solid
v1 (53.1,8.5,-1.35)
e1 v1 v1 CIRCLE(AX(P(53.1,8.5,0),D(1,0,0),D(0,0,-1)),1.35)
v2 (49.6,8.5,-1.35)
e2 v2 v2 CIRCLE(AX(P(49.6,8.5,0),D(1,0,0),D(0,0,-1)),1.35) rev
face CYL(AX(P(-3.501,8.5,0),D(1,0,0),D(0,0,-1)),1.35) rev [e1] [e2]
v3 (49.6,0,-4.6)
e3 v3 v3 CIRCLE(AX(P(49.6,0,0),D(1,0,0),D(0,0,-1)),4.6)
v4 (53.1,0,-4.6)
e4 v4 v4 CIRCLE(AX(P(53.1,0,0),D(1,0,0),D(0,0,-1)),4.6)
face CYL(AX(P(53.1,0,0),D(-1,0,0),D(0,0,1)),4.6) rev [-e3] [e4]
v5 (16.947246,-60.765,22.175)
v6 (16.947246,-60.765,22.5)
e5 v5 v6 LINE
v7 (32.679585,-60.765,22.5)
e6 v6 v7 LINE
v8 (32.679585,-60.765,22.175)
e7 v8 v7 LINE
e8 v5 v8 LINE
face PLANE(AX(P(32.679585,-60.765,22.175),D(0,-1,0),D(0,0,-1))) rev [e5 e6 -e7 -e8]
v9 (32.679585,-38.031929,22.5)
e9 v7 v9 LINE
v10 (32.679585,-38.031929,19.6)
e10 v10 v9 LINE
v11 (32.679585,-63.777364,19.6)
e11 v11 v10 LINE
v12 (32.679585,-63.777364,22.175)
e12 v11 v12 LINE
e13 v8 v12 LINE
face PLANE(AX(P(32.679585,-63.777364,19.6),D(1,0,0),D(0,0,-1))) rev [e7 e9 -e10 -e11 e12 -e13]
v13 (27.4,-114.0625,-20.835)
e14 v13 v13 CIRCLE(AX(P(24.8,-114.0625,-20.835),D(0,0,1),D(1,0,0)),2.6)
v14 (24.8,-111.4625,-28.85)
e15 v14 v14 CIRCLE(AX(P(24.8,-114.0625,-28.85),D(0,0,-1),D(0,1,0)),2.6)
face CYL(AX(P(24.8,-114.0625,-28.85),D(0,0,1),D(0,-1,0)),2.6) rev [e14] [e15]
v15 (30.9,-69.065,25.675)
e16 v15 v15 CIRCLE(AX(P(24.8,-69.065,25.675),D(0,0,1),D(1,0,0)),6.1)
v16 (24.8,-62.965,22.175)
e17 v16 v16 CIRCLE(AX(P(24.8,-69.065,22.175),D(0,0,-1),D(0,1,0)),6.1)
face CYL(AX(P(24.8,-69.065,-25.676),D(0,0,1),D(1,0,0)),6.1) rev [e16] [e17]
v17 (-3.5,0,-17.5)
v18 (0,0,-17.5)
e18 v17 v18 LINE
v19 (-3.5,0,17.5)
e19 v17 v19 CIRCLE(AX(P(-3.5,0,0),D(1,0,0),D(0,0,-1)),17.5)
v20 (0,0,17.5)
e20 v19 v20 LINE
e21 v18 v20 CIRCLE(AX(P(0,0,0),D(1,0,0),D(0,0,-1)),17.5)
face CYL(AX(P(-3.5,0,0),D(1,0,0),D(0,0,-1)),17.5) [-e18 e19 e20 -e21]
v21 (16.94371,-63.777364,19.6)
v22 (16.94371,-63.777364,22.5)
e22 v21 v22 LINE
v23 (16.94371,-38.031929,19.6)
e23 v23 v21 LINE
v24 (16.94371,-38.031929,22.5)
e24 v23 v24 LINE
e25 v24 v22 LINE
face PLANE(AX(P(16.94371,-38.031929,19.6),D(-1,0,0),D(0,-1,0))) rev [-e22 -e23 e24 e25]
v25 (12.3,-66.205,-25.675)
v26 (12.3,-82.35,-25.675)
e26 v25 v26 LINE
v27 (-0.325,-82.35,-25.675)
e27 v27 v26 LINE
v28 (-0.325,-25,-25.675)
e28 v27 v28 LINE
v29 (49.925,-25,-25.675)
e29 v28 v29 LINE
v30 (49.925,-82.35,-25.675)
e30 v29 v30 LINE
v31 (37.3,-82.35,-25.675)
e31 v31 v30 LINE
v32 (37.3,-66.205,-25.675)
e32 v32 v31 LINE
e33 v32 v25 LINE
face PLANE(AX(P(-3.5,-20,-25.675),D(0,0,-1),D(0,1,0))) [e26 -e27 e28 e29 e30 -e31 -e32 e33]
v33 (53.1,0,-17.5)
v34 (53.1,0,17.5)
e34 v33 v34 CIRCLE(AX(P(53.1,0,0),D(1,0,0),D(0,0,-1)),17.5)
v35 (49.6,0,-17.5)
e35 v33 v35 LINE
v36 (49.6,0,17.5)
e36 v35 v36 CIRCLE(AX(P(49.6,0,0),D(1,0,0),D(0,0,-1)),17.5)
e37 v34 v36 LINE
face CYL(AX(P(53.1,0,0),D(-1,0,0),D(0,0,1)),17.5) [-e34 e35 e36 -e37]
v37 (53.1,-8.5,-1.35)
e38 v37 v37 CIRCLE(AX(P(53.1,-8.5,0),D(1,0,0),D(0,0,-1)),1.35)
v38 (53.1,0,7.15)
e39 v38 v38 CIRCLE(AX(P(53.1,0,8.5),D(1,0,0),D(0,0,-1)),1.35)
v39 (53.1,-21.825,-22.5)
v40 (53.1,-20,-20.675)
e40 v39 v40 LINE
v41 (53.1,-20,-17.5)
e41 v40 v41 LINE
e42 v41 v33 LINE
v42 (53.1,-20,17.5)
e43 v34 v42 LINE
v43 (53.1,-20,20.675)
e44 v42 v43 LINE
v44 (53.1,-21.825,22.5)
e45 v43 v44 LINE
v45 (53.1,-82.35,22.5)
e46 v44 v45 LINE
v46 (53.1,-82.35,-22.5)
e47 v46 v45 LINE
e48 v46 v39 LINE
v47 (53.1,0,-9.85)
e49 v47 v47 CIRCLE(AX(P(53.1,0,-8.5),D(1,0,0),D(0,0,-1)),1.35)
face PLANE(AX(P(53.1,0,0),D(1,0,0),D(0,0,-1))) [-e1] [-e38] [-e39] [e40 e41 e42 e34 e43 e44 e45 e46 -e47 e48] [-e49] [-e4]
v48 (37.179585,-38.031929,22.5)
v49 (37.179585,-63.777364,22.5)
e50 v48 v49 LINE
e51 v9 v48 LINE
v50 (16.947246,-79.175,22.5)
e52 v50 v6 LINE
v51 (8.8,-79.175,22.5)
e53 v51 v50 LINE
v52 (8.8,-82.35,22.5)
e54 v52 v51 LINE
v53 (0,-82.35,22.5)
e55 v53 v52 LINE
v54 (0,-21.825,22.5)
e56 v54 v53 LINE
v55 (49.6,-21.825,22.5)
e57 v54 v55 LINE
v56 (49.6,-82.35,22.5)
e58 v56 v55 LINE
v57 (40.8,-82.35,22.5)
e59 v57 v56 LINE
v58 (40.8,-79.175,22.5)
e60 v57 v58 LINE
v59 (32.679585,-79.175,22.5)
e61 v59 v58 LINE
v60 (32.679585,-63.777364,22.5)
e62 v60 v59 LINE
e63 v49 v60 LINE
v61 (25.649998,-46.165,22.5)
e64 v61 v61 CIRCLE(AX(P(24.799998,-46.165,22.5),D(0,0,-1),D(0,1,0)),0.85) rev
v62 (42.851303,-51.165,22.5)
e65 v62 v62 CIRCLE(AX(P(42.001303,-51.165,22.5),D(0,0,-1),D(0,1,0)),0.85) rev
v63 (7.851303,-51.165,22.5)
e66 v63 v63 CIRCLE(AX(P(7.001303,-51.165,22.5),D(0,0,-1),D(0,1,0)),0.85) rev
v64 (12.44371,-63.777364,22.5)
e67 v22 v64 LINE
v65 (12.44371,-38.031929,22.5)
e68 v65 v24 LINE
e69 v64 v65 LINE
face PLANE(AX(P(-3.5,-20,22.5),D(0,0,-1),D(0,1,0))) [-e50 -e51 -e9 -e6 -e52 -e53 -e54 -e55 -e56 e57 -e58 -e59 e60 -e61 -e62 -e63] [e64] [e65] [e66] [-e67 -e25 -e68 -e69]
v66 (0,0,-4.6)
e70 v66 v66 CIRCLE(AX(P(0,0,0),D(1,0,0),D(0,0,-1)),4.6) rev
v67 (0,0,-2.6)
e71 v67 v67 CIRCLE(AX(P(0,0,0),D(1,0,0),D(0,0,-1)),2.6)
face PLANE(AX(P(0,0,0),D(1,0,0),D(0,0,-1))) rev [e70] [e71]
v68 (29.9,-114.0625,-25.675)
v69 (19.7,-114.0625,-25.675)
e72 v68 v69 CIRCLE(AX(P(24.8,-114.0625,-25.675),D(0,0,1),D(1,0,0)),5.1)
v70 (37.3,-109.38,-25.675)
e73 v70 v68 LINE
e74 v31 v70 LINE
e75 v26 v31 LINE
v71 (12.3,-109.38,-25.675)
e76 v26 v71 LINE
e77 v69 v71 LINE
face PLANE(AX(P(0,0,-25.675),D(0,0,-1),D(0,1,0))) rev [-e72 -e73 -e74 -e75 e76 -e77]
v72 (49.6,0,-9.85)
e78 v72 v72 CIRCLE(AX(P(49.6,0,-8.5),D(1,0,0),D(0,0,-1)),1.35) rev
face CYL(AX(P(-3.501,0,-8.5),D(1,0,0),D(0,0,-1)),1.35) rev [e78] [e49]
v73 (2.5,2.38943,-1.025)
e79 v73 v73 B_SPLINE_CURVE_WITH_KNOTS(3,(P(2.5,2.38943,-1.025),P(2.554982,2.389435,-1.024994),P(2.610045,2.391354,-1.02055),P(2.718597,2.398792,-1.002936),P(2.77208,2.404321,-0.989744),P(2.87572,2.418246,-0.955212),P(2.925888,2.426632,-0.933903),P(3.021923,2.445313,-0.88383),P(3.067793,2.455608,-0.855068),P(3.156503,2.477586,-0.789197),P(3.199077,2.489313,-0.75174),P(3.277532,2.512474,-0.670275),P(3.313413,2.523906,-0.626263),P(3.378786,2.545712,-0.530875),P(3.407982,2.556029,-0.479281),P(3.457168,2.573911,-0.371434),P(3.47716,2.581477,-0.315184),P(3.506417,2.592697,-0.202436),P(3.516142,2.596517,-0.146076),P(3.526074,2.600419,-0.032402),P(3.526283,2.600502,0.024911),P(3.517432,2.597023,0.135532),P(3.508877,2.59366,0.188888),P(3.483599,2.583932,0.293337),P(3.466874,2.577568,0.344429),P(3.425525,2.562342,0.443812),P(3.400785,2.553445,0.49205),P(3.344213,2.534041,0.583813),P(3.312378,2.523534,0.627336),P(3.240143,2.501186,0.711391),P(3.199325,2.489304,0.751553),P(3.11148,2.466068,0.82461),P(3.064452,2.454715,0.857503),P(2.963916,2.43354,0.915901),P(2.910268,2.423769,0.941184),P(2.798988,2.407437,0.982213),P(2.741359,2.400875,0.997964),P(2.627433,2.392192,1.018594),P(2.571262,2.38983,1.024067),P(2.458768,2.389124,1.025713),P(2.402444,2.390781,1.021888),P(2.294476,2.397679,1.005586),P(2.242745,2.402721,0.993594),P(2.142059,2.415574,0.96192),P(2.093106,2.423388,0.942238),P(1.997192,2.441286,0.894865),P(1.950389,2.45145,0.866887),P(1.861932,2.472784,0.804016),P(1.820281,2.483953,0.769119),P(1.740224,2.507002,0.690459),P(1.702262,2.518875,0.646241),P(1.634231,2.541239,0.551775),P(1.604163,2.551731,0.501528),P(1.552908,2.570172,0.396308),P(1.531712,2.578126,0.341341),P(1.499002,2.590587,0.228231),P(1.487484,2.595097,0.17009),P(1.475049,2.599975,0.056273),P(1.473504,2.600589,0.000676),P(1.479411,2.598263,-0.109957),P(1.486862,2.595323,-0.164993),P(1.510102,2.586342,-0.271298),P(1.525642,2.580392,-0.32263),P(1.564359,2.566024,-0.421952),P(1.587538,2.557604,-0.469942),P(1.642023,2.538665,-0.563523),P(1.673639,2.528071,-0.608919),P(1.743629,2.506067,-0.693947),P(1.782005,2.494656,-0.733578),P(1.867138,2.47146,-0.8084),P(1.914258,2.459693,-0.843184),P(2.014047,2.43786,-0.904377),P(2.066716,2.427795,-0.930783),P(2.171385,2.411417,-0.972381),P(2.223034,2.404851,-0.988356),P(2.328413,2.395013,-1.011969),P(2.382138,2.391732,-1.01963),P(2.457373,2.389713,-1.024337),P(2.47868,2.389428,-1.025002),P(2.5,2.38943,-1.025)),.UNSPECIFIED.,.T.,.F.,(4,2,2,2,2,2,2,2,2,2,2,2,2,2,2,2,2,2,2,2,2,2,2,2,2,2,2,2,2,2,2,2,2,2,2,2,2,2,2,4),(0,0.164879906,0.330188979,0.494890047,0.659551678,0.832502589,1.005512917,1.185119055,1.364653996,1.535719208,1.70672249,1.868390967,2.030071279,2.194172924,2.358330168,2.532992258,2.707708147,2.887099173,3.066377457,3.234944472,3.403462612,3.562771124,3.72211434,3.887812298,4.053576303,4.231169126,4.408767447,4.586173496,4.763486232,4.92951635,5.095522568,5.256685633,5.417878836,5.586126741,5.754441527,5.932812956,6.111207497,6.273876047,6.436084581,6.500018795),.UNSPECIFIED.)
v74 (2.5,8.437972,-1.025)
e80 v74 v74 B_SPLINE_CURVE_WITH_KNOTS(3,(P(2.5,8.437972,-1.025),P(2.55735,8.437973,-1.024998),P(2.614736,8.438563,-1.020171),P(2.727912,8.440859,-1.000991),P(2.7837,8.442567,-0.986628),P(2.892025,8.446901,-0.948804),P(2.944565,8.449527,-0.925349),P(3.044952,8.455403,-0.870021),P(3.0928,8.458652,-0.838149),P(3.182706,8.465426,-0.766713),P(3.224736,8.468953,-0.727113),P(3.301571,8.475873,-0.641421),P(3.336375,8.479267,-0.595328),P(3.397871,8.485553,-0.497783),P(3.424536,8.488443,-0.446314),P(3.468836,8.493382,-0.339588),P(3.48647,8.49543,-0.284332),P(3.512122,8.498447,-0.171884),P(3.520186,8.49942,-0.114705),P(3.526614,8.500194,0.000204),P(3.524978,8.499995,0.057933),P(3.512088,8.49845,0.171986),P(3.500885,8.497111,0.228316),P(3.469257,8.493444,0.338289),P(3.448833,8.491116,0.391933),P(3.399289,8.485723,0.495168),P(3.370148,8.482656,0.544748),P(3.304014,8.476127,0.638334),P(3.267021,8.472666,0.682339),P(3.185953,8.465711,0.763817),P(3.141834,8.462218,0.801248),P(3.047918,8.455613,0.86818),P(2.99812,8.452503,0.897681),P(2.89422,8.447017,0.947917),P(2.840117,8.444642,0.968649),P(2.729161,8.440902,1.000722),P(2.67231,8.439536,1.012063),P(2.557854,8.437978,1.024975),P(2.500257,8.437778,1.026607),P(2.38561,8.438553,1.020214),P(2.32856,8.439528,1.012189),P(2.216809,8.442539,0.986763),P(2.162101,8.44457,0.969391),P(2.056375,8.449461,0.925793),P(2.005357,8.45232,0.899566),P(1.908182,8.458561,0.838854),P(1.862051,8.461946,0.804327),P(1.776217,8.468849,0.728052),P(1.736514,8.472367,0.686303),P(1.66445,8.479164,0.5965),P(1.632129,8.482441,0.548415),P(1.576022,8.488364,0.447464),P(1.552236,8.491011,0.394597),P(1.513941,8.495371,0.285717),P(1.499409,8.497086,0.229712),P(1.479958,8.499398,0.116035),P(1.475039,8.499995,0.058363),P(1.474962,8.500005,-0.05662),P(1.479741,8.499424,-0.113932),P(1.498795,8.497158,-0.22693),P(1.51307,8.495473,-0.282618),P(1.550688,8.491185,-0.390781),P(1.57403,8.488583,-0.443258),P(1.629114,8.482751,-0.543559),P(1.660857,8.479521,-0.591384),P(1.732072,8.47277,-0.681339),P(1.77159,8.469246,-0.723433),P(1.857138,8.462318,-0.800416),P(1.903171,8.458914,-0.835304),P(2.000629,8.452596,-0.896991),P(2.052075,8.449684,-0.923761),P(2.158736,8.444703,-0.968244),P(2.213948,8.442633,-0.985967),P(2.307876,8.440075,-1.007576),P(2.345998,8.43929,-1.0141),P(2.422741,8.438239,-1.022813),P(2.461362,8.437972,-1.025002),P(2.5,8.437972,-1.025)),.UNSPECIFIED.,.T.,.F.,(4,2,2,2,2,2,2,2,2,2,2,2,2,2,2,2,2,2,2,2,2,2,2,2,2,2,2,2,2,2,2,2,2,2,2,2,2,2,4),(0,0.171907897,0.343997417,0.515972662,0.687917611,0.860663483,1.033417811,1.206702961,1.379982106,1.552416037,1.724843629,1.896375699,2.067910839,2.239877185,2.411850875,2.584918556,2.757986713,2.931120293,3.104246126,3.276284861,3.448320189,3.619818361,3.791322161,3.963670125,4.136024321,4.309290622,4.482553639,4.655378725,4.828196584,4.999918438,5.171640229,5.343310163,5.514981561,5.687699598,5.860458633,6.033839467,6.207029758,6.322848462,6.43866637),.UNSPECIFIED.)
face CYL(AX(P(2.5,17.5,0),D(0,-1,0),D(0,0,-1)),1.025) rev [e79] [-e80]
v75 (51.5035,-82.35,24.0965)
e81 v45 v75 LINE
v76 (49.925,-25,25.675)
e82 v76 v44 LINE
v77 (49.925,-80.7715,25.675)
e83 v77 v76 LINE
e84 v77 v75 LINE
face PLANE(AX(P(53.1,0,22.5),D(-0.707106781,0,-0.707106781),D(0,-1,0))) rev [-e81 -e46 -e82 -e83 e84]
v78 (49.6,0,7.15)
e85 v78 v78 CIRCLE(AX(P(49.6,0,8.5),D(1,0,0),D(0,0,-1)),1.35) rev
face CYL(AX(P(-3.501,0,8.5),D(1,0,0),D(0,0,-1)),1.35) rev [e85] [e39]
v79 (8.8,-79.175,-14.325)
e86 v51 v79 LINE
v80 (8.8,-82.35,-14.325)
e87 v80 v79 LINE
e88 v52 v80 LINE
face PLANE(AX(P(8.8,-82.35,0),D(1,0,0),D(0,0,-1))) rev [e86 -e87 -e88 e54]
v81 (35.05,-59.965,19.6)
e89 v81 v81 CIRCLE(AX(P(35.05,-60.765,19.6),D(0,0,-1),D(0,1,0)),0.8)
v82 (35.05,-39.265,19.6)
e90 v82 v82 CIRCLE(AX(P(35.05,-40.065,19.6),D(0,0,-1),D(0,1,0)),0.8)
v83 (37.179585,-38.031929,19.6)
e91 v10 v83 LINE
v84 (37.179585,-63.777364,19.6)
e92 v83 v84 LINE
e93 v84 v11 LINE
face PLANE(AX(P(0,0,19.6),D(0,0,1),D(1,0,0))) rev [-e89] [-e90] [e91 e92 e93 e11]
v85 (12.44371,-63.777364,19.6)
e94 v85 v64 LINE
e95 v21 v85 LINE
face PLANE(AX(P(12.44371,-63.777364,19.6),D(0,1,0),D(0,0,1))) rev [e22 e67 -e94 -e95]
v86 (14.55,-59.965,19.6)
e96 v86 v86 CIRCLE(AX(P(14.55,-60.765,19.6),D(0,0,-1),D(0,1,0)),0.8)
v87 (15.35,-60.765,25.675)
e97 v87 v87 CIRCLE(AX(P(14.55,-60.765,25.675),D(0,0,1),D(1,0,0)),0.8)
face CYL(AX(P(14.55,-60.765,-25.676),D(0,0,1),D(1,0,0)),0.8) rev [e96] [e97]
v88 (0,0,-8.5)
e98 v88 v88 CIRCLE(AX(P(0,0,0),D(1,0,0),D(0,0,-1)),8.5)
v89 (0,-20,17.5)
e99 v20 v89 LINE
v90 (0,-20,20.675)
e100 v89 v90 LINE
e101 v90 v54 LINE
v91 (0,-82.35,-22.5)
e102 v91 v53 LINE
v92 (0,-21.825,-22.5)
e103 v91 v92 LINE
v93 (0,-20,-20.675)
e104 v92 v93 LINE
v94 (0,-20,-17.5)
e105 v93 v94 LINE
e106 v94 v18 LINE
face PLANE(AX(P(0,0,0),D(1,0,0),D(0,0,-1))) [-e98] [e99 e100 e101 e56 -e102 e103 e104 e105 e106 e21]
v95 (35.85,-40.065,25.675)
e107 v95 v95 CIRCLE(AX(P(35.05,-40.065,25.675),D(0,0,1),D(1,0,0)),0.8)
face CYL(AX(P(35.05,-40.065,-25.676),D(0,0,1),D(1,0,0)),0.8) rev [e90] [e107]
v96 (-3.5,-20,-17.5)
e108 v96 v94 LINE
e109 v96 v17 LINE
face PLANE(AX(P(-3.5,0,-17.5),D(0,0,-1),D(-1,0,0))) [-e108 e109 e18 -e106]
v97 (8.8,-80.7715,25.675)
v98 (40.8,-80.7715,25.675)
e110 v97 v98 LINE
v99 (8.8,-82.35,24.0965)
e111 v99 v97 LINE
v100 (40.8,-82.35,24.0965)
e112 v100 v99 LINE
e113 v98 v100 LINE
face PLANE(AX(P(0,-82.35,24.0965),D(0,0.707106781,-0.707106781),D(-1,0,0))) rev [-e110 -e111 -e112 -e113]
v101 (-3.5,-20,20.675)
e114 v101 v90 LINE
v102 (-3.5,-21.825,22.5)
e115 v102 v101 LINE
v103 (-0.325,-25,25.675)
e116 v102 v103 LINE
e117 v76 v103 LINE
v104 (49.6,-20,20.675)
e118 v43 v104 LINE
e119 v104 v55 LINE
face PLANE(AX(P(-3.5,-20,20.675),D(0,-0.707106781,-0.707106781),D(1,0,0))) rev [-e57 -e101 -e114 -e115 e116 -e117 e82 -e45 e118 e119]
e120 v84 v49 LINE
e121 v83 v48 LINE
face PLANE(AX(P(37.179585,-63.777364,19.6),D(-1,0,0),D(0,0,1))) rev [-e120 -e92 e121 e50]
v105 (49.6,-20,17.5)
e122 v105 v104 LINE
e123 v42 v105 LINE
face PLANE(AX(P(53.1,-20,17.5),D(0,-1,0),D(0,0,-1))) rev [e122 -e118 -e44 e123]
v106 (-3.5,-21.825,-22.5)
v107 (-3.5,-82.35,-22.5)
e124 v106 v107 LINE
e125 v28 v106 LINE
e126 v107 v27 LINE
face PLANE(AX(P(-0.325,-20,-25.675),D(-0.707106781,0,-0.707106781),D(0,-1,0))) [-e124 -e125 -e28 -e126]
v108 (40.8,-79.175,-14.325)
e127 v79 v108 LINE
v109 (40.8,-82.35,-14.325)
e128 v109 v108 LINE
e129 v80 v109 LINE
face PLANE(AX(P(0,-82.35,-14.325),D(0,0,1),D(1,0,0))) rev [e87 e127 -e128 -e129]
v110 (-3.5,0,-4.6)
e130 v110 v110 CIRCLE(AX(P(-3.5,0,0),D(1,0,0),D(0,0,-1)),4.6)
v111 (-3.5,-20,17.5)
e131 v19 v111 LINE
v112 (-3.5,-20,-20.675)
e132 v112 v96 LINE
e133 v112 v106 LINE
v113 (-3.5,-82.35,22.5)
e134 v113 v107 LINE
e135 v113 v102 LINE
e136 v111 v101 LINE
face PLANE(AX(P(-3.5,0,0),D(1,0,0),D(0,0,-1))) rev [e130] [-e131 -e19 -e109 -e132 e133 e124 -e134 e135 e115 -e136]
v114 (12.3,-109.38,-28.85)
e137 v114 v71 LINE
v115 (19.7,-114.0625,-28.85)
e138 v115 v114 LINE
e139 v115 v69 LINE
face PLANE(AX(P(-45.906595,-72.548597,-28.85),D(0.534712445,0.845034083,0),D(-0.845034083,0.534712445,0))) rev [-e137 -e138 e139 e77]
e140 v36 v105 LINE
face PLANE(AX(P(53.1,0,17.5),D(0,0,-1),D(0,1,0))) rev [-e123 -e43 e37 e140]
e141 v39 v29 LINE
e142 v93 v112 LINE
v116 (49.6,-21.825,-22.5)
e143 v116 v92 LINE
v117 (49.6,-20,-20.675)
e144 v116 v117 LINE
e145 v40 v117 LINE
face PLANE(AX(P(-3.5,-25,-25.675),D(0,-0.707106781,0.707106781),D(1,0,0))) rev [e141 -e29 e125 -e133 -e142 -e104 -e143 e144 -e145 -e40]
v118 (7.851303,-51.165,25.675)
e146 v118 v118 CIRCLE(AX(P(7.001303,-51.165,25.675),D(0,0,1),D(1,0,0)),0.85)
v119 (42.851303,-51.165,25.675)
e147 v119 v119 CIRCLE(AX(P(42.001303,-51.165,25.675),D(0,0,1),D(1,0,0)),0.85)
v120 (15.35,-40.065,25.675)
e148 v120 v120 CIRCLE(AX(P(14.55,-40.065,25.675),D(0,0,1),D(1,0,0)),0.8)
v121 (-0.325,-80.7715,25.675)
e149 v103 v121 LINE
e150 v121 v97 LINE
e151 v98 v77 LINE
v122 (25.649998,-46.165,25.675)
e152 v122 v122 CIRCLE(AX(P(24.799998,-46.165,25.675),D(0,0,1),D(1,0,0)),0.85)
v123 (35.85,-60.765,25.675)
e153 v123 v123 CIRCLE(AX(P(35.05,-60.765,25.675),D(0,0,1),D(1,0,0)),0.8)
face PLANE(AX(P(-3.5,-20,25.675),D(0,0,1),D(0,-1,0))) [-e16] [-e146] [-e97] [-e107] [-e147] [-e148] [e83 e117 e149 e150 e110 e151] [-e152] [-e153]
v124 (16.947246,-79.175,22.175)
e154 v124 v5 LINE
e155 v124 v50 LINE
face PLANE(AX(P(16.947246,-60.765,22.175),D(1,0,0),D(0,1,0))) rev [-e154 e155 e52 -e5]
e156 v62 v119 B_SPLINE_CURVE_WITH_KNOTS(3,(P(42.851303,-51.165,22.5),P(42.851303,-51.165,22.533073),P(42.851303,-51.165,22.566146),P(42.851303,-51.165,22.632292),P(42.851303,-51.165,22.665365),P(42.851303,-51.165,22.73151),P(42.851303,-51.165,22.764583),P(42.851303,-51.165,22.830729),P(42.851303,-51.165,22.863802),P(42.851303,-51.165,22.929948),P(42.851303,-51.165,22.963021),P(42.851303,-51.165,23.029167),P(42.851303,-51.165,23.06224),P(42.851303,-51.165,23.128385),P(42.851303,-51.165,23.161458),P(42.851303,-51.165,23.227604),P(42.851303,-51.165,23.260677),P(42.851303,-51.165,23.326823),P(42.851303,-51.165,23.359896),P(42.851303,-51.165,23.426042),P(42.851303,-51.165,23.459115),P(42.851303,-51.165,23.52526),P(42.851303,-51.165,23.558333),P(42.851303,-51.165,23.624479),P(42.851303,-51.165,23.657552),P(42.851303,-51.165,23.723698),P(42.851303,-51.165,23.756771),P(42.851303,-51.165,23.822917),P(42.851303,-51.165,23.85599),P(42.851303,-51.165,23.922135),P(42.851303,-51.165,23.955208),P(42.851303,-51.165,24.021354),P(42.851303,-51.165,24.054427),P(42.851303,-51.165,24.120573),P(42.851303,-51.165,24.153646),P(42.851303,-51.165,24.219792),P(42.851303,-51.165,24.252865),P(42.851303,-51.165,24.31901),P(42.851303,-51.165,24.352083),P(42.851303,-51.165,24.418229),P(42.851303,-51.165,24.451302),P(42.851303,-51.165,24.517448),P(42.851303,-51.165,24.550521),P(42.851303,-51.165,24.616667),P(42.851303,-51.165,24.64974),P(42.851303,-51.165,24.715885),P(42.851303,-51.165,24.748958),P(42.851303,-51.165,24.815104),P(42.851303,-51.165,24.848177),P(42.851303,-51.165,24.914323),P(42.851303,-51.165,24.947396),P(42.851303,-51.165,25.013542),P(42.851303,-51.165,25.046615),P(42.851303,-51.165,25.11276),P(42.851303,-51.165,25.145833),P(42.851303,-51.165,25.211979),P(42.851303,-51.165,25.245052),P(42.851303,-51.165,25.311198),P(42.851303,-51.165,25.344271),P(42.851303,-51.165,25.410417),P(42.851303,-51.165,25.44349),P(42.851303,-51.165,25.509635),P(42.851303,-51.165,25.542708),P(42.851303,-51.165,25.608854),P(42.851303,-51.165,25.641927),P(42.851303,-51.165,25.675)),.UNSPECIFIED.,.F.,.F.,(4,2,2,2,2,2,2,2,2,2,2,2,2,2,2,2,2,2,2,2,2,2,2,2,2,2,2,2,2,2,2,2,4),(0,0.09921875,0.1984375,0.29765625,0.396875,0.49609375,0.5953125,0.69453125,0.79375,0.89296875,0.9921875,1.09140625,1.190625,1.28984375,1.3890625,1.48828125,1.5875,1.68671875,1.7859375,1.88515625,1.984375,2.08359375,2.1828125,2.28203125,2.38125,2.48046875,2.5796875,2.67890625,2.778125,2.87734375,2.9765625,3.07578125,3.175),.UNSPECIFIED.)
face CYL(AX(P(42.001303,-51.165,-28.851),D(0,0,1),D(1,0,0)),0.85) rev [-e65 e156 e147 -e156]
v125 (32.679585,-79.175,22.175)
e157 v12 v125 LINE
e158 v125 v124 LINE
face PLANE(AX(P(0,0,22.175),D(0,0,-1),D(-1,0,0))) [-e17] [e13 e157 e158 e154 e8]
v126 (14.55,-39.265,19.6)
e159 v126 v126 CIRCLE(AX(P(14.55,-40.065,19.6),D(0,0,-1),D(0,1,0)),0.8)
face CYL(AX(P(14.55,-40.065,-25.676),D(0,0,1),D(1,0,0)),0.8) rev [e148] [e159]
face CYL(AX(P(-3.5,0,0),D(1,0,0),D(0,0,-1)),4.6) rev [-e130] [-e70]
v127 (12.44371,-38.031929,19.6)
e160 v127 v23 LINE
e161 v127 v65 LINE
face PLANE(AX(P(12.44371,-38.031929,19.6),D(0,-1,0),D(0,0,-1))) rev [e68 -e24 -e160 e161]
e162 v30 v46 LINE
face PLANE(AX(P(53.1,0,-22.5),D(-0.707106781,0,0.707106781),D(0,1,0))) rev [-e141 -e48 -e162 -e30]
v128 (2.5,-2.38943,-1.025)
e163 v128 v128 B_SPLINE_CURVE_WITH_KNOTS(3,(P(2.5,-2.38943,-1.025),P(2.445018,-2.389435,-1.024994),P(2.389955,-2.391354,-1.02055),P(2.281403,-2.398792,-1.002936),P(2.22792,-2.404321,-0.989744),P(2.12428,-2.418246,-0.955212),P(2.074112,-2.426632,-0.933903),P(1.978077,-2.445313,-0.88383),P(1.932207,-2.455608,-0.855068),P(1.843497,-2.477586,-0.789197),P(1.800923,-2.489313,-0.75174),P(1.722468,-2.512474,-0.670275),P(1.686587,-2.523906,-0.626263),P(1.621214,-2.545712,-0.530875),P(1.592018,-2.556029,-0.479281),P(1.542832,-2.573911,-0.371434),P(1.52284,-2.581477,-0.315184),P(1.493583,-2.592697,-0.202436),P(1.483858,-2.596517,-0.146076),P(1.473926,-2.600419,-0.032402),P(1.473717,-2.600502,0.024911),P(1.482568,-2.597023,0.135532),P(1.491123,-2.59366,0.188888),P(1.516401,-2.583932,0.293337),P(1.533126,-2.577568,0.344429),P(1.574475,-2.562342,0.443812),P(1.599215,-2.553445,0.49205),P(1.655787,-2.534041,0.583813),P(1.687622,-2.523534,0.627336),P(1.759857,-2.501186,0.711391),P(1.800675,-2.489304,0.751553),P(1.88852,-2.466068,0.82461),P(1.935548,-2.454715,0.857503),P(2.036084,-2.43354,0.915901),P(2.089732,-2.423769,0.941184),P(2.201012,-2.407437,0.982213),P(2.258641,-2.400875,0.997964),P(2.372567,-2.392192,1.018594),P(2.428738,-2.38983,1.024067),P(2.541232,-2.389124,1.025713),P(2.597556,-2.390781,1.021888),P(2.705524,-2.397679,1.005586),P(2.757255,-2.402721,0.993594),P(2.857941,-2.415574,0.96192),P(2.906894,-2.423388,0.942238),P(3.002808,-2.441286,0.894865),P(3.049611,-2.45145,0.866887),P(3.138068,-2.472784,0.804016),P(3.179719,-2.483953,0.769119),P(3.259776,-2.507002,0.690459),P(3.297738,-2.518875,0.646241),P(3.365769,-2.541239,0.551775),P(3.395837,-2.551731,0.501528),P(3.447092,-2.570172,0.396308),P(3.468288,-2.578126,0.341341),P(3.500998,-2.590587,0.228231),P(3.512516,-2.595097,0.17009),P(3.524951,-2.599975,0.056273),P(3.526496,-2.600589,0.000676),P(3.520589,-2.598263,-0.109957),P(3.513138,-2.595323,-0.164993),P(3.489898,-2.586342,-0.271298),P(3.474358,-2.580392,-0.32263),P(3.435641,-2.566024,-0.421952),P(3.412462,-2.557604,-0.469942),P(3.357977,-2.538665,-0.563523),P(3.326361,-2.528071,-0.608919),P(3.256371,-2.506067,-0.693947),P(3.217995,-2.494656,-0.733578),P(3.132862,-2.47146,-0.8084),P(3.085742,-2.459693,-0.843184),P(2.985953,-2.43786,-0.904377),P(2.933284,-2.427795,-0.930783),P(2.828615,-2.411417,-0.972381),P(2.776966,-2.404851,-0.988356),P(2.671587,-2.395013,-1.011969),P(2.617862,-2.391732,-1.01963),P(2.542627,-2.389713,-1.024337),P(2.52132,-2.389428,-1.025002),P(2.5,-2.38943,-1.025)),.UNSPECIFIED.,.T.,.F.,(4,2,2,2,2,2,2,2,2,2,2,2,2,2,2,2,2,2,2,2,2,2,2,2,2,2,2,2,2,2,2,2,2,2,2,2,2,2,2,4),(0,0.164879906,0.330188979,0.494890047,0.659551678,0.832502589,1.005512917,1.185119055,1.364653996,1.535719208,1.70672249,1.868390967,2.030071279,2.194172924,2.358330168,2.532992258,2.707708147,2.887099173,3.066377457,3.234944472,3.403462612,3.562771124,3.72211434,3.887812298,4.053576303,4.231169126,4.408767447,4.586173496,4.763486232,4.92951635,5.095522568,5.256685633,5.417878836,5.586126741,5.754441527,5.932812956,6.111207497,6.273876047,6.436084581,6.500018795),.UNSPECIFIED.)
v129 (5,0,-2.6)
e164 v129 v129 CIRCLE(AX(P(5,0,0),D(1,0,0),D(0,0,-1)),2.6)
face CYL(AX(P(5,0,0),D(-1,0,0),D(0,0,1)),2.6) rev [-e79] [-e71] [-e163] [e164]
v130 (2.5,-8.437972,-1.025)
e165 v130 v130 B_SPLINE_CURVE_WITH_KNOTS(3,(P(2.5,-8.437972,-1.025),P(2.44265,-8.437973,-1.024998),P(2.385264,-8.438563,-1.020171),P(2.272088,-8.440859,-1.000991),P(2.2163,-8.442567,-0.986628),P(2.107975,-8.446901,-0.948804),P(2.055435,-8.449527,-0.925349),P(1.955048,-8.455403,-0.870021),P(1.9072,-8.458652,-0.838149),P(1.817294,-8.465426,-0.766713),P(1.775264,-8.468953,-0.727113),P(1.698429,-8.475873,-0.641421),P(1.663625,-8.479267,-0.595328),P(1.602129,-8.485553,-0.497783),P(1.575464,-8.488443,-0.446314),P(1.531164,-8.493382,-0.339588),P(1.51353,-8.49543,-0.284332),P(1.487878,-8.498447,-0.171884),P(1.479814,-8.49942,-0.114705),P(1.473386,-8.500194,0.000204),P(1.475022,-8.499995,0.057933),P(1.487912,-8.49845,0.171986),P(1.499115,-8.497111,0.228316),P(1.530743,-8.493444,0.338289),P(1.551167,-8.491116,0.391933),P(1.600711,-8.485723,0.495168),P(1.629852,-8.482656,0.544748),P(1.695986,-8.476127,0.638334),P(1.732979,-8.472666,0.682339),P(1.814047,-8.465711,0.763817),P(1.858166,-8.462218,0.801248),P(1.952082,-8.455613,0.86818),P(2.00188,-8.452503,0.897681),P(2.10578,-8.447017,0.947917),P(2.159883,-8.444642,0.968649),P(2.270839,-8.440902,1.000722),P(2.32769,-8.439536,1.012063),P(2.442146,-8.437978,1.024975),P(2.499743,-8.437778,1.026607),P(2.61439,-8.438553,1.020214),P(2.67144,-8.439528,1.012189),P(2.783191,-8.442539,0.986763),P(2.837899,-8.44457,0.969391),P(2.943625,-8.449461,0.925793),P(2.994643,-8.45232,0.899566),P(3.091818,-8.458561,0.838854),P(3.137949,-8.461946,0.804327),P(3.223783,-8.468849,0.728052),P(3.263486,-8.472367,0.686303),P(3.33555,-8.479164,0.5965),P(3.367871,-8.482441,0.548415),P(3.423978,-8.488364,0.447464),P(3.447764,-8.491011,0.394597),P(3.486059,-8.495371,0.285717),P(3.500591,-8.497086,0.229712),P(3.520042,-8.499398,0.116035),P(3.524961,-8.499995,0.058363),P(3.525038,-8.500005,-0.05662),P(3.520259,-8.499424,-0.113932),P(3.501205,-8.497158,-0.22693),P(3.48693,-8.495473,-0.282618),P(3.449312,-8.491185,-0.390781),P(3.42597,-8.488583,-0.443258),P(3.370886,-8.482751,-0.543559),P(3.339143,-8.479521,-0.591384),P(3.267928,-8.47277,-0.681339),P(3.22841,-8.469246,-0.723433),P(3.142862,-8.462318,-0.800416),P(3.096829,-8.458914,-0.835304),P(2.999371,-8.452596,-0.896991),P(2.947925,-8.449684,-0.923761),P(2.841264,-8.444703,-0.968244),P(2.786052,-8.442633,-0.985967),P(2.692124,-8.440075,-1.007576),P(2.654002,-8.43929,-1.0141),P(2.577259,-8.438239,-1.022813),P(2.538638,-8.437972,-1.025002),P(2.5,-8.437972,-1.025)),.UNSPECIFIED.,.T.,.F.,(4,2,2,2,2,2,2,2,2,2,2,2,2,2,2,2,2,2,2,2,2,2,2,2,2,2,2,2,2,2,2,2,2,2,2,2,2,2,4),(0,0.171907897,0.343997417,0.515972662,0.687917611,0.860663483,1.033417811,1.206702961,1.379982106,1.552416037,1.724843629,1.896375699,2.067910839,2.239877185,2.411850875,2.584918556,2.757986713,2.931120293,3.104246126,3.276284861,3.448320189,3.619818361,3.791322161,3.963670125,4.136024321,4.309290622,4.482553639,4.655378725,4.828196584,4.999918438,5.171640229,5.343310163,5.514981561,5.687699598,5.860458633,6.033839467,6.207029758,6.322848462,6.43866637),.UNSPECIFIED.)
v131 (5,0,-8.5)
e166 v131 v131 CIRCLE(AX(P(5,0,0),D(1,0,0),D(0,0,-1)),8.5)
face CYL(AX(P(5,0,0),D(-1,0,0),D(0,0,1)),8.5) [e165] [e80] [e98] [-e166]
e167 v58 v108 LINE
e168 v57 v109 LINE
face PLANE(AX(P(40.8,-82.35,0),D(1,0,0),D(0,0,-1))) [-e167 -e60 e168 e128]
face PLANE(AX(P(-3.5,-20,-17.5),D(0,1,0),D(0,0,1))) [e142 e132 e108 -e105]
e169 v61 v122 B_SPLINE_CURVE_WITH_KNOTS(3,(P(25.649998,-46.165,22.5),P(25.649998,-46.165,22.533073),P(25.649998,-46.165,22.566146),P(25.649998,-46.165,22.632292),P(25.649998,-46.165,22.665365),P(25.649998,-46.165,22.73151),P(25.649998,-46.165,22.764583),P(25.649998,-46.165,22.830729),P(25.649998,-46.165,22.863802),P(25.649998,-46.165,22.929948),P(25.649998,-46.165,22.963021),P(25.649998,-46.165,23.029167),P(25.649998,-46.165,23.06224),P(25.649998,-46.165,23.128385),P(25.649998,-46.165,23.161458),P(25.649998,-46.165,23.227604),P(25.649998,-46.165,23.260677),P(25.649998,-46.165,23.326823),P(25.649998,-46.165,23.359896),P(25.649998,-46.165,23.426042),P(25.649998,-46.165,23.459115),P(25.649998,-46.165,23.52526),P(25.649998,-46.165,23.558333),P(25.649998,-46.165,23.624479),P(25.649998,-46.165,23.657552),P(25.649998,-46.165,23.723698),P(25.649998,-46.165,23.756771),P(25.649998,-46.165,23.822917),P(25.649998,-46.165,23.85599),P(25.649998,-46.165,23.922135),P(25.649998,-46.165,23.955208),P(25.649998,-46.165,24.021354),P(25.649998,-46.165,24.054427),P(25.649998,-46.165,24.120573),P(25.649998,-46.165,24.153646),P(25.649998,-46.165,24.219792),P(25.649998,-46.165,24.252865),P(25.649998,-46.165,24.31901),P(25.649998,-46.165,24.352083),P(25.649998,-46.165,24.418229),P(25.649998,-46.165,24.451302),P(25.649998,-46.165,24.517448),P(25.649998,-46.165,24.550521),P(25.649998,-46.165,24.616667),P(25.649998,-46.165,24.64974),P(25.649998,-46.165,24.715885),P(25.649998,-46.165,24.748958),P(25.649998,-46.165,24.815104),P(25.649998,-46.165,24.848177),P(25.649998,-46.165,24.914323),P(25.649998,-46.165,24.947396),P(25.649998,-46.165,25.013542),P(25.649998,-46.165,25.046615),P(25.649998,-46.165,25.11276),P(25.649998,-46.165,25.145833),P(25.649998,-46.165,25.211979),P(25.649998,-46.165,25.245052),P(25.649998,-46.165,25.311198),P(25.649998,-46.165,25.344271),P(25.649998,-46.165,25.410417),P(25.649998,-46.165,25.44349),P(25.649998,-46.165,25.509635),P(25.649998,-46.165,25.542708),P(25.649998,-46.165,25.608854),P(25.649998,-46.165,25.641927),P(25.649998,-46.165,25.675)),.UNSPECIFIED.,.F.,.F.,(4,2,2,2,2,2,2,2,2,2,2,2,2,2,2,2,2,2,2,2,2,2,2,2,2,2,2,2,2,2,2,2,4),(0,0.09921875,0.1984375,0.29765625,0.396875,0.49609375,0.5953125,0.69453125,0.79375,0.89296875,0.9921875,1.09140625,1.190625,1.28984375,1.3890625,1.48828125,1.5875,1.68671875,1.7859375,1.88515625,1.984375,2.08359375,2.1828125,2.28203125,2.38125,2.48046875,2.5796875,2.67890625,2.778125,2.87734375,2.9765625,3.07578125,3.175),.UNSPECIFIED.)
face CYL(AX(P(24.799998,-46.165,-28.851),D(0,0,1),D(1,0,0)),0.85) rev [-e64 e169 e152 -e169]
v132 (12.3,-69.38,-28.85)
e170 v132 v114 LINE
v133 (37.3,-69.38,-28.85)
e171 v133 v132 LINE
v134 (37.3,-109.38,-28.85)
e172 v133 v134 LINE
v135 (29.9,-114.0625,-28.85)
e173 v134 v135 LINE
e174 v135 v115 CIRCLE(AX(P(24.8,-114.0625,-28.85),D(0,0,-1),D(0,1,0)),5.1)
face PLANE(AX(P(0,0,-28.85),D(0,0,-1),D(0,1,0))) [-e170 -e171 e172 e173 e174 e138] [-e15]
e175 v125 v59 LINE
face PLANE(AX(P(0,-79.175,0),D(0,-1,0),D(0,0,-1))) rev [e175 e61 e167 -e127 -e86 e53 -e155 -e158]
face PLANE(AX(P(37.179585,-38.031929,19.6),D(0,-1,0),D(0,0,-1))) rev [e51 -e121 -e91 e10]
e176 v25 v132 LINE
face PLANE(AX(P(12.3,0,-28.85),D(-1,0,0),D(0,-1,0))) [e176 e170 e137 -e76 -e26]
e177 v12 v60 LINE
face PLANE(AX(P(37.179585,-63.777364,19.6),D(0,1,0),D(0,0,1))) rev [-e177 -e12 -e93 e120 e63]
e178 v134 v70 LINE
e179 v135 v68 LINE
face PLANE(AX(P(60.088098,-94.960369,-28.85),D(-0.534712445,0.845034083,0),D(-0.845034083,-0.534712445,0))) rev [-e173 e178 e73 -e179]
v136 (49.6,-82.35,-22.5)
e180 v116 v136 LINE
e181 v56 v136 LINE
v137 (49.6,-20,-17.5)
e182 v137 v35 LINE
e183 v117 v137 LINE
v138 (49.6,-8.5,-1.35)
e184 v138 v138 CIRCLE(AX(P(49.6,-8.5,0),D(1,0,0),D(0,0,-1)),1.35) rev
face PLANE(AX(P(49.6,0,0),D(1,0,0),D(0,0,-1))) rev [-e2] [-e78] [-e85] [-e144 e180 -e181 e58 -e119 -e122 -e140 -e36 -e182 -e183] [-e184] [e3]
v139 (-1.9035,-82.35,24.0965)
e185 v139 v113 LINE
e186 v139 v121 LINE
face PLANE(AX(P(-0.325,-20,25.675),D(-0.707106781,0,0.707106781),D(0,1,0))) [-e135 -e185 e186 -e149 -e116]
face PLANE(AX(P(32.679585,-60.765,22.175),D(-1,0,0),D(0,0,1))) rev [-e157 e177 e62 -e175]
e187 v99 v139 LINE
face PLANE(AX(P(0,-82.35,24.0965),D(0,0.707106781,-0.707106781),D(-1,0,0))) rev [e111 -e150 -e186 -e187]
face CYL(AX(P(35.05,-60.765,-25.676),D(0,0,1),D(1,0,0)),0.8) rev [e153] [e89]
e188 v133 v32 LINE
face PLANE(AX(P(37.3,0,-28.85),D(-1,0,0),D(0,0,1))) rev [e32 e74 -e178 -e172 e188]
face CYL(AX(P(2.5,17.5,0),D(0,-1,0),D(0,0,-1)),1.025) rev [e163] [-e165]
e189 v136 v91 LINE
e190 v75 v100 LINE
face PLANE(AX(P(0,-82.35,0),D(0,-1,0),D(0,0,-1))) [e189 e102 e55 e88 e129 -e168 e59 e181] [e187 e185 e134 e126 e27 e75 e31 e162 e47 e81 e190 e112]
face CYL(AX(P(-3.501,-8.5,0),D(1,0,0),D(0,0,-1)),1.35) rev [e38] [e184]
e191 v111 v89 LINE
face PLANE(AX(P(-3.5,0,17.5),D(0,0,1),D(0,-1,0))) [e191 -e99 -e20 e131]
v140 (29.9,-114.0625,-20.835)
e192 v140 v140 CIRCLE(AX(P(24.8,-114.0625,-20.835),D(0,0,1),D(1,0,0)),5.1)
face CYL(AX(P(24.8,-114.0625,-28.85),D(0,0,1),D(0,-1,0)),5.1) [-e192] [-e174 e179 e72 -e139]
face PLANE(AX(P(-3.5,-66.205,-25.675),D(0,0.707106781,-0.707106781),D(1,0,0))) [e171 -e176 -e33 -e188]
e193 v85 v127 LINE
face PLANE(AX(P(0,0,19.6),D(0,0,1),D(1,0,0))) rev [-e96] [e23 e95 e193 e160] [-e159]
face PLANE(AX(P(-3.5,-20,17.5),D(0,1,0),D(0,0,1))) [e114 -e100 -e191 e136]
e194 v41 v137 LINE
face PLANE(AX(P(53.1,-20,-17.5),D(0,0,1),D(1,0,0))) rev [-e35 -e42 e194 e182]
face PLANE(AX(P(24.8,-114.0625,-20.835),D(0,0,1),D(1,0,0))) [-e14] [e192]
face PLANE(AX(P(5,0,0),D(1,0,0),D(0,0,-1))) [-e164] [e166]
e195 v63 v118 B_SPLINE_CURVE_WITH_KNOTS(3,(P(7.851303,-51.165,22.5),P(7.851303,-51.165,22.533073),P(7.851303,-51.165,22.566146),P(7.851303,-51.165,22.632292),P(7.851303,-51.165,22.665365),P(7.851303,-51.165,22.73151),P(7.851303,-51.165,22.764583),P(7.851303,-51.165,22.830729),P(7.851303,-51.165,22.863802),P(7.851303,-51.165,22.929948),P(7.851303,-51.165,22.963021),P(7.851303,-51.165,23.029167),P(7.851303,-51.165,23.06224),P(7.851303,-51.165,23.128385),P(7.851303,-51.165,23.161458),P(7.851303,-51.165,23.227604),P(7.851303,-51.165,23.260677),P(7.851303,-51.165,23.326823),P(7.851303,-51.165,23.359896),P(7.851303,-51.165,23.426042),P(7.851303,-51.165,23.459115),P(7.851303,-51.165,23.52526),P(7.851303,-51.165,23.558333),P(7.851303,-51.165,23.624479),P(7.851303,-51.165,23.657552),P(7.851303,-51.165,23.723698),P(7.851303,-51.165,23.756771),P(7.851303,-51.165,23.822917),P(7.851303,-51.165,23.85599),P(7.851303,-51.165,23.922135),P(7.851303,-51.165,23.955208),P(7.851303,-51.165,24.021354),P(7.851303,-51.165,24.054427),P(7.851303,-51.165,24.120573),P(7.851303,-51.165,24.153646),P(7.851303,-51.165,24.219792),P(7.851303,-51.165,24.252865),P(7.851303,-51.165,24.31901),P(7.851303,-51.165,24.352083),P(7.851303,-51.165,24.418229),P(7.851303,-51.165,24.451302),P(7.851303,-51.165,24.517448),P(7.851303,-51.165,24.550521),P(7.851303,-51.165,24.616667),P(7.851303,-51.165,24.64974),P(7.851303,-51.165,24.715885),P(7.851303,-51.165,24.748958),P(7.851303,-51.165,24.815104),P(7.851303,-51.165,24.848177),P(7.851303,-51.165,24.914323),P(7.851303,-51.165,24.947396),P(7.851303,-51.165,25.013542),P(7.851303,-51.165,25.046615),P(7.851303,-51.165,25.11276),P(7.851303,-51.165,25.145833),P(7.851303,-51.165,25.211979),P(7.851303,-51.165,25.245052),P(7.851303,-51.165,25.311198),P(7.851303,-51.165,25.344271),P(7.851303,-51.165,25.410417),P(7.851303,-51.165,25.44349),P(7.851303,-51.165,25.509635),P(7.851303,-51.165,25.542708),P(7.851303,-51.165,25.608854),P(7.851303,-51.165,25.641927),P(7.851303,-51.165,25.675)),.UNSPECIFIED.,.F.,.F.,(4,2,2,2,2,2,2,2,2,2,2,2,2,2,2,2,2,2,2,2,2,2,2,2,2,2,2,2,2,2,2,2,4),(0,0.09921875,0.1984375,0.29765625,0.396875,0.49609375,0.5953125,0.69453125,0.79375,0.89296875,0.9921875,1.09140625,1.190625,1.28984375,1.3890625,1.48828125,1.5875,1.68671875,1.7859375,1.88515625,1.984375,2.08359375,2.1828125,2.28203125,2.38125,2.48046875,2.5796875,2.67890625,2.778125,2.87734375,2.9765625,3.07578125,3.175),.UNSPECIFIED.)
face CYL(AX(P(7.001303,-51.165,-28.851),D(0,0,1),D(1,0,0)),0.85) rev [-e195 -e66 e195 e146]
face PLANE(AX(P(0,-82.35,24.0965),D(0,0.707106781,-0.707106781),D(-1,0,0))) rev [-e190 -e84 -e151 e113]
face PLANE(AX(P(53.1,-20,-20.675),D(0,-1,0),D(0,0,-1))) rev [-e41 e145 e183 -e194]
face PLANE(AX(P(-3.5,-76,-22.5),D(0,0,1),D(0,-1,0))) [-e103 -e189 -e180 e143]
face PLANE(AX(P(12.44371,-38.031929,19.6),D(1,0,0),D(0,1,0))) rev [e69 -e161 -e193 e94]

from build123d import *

# Parameters (mm, degrees)
SKETCH1_R                = 4.6
BOSS_EXTRUDE1_DEPTH      = 3.5
BOSS_EXTRUDE2_DEPTH      = 49.6
BOSS_EXTRUDE2_DEPTH_BACK = 3.5
CHAMFER2_SIZE            = 5
CUT_EXTRUDE1_REACH       = 110.911
SKETCH4_W                = 49.6
SKETCH4_H                = 45
BOSS_EXTRUDE3_START      = 3.5
SKETCH5_R                = 4.6
BOSS_EXTRUDE3_DEPTH      = 3.5
CHAMFER3_SIZE            = 3.175
SKETCH6_R                = 8.5
SKETCH6_R_2              = 2.6
BOSS_EXTRUDE4_DEPTH      = 5
SKETCH7_R                = 1.025
CUT_EXTRUDE2_DEPTH       = 114.246948082
CUT_EXTRUDE3_REACH       = 102.655
SKETCH9_R                = 1.35
SKETCH10_W               = 32
SKETCH10_H               = 36.825
SKETCH10_H_2             = 3.175
BOSS_EXTRUDE5_DEPTH      = 3.175
CHAMFER4_SIZE            = 1.5785
BOSS_EXTRUDE6_DEPTH      = 3.175
CHAMFER5_SIZE            = 1.5785
CUT_EXTRUDE4_REACH       = 112.625
SKETCH12_R               = 6.1
SKETCH12_R_2             = 0.800000003
SKETCH12_R_3             = 0.800000004
SKETCH12_R_4             = 0.8
SKETCH13_W               = 4.5
SKETCH13_H               = 25.745434895
SKETCH13_R               = 0.8
SKETCH13_R_2             = 0.800000003
SKETCH13_R_3             = 0.800000004
BOSS_EXTRUDE7_DEPTH      = 2.9
SKETCH14_W               = 15.732338892
SKETCH14_H               = 18.41
SKETCH14_R               = 6.1
BOSS_EXTRUDE8_DEPTH      = 0.325
SKETCH20_R               = 2.6
BOSS_EXTRUDE11_DEPTH     = 3.175
BOSS_EXTRUDE12_START     = 4.84
SKETCH21_R               = 5.1
SKETCH21_R_2             = 2.6
BOSS_EXTRUDE12_DEPTH     = 4.84
CHAMFER10_SIZE           = 3.175
CUT_EXTRUDE5_REACH       = 143.394
SKETCH23_R               = 0.85


with BuildPart() as part:
    # Sketch1 → Boss-Extrude1 (new body)
    with BuildSketch(Plane(origin=(0, 0, 0), x_dir=(0, 0, -1), z_dir=(1, 0, 0))):
        with BuildLine():
            Line((-17.5, 0), (-17.5, -20))
            Line((-17.5, -20), (-22.5, -20))
            Line((-22.5, -20), (-22.5, -76))
            Line((-22.5, -76), (22.5, -76))
            Line((22.5, -76), (22.5, -20))
            Line((22.5, -20), (17.5, -20))
            Line((17.5, -20), (17.5, 0))
            ThreePointArc((17.5, 0), (0, 17.5), (-17.5, 0))
        make_face()
        Circle(SKETCH1_R, mode=Mode.SUBTRACT)
    extrude(amount=-BOSS_EXTRUDE1_DEPTH)

    # Sketch2 → Boss-Extrude2 (add, two sides: drawn at the far end of the back side and taken through both)
    with BuildSketch(Plane(origin=(0, 0, 0), x_dir=(0, 0, -1), z_dir=(1, 0, 0)).offset(-BOSS_EXTRUDE2_DEPTH_BACK)):
        Polygon((-22.5, -20), (-22.5, -76), (22.5, -76), (22.5, -20), (25.675, -20), (25.675, -79.175), (-25.675, -79.175), (-25.675, -20), align=None)
    extrude(amount=BOSS_EXTRUDE2_DEPTH + BOSS_EXTRUDE2_DEPTH_BACK)

    # Chamfer2
    chamfer2_edges = [part.edges().sort_by_distance(p)[0] for p in [
        (23.05, -20, -25.675),
        (23.05, -20, 25.675),
    ]]
    chamfer(chamfer2_edges, length=CHAMFER2_SIZE)

    # Sketch4 → Cut-Extrude1 (cut, up to next)
    with BuildSketch(Plane(origin=(0, -76, 0), x_dir=(1, 0, 0), z_dir=(0, 1, 0)), mode=Mode.PRIVATE) as cut_extrude1_sk1:
        with Locations((24.8, 0)):
            Rectangle(SKETCH4_W, SKETCH4_H)
    cut_extrude1_tool1 = extrude(cut_extrude1_sk1.sketch, amount=-CUT_EXTRUDE1_REACH, mode=Mode.PRIVATE) & part.part
    add(cut_extrude1_tool1.solids().sort_by_distance((24.8, -76, 0))[0], mode=Mode.SUBTRACT)

    # Sketch5 → Boss-Extrude3 (add)
    with BuildSketch(Plane(origin=(49.6, 0, 0), x_dir=(0, 0, -1), z_dir=(1, 0, 0)).offset(BOSS_EXTRUDE3_START)):
        with BuildLine():
            Line((20.675, -20), (17.5, -20))
            Line((17.5, -20), (17.5, 0))
            ThreePointArc((17.5, 0), (0, 17.5), (-17.5, 0))
            Line((-17.5, 0), (-17.5, -20))
            Line((-17.5, -20), (-20.675, -20))
            Line((-20.675, -20), (-25.675, -25))
            Line((-25.675, -25), (-25.675, -79.175))
            Line((-25.675, -79.175), (25.675, -79.175))
            Line((25.675, -79.175), (25.675, -25))
            Line((25.675, -25), (20.675, -20))
        make_face()
        Circle(SKETCH5_R, mode=Mode.SUBTRACT)
    extrude(amount=-BOSS_EXTRUDE3_DEPTH)

    # Chamfer3
    chamfer3_edges = [part.edges().sort_by_distance(p)[0] for p in [
        (-3.5, -52.0875, -25.675),
        (-3.5, -52.0875, 25.675),
        (53.1, -52.0875, 25.675),
        (53.1, -52.0875, -25.675),
    ]]
    chamfer(chamfer3_edges, length=CHAMFER3_SIZE)

    # Sketch6 → Boss-Extrude4 (add)
    with BuildSketch(Plane(origin=(0, 0, 0), x_dir=(0, 0, -1), z_dir=(1, 0, 0))):
        Circle(SKETCH6_R)
        Circle(SKETCH6_R_2, mode=Mode.SUBTRACT)
    extrude(amount=BOSS_EXTRUDE4_DEPTH)

    # Sketch7 → Cut-Extrude2 (cut, through all)
    with BuildSketch(Plane.XZ.offset(79.175)):
        with Locations(Location((2.5, 0, 0), (0, 0, 270))):
            Circle(SKETCH7_R)
    extrude(amount=-CUT_EXTRUDE2_DEPTH, mode=Mode.SUBTRACT)

    # Sketch9 → Cut-Extrude3 (cut, up to next)
    with BuildSketch(Plane(origin=(53.1, 0, 0), x_dir=(0, 0, -1), z_dir=(1, 0, 0)), mode=Mode.PRIVATE) as cut_extrude3_sk1:
        with Locations((0, 8.5)):
            Circle(SKETCH9_R)
    cut_extrude3_tool1 = extrude(cut_extrude3_sk1.sketch, amount=-CUT_EXTRUDE3_REACH, mode=Mode.PRIVATE) & part.part
    # Sketch9 → Cut-Extrude3 (cut, up to next)
    with BuildSketch(Plane(origin=(53.1, 0, 0), x_dir=(0, 0, -1), z_dir=(1, 0, 0)), mode=Mode.PRIVATE) as cut_extrude3_sk2:
        with Locations((8.5, 0)):
            Circle(SKETCH9_R)
    cut_extrude3_tool2 = extrude(cut_extrude3_sk2.sketch, amount=-CUT_EXTRUDE3_REACH, mode=Mode.PRIVATE) & part.part
    # Sketch9 → Cut-Extrude3 (cut, up to next)
    with BuildSketch(Plane(origin=(53.1, 0, 0), x_dir=(0, 0, -1), z_dir=(1, 0, 0)), mode=Mode.PRIVATE) as cut_extrude3_sk3:
        with Locations((0, -8.5)):
            Circle(SKETCH9_R)
    cut_extrude3_tool3 = extrude(cut_extrude3_sk3.sketch, amount=-CUT_EXTRUDE3_REACH, mode=Mode.PRIVATE) & part.part
    # Sketch9 → Cut-Extrude3 (cut, up to next)
    with BuildSketch(Plane(origin=(53.1, 0, 0), x_dir=(0, 0, -1), z_dir=(1, 0, 0)), mode=Mode.PRIVATE) as cut_extrude3_sk4:
        with Locations((-8.5, 0)):
            Circle(SKETCH9_R)
    cut_extrude3_tool4 = extrude(cut_extrude3_sk4.sketch, amount=-CUT_EXTRUDE3_REACH, mode=Mode.PRIVATE) & part.part
    add(cut_extrude3_tool1.solids().sort_by_distance((53.1, 8.5, 0))[0], mode=Mode.SUBTRACT)
    add(cut_extrude3_tool2.solids().sort_by_distance((53.1, 0, -8.5))[0], mode=Mode.SUBTRACT)
    add(cut_extrude3_tool3.solids().sort_by_distance((53.1, -8.5, 0))[0], mode=Mode.SUBTRACT)
    add(cut_extrude3_tool4.solids().sort_by_distance((53.1, 0, 8.5))[0], mode=Mode.SUBTRACT)

    # Sketch10 → Boss-Extrude5 (add)
    with BuildSketch(Plane.XZ.offset(79.175)):
        with Locations((24.8, 4.0875)):
            Rectangle(SKETCH10_W, SKETCH10_H)
        with Locations((24.8, 24.0875)):
            Rectangle(SKETCH10_W, SKETCH10_H_2)
    extrude(amount=BOSS_EXTRUDE5_DEPTH)

    # Chamfer4
    chamfer4_edges = [part.edges().sort_by_distance(p)[0] for p in [
        (24.8, -82.35, 25.675),
    ]]
    chamfer(chamfer4_edges, length=CHAMFER4_SIZE)

    # Sketch11 → Boss-Extrude6 (add)
    with BuildSketch(Plane.XZ.offset(79.175)):
        Polygon((49.925, 25.675), (40.8, 25.675), (40.8, 22.5), (49.6, 22.5), (49.6, -22.5), (0, -22.5), (0, 22.5), (8.8, 22.5), (8.8, 25.675), (-0.325, 25.675), (-3.5, 22.5), (-3.5, -22.5), (-0.325, -25.675), (49.925, -25.675), (53.1, -22.5), (53.1, 22.5), align=None)
    extrude(amount=BOSS_EXTRUDE6_DEPTH)

    # Chamfer5
    chamfer5_edges = [part.edges().sort_by_distance(p)[0] for p in [
        (4.2375, -82.35, 25.675),
        (45.3625, -82.35, 25.675),
    ]]
    chamfer(chamfer5_edges, length=CHAMFER5_SIZE - 0.0001)  # a hair under: the kernel refuses the full size

    # Sketch12 → Cut-Extrude4 (cut, up to next)
    with BuildSketch(Plane.XY.offset(25.675), mode=Mode.PRIVATE) as cut_extrude4_sk1:
        with Locations((24.8, -69.065)):
            Circle(SKETCH12_R)
    cut_extrude4_tool1 = extrude(cut_extrude4_sk1.sketch, amount=-CUT_EXTRUDE4_REACH, mode=Mode.PRIVATE) & part.part
    # Sketch12 → Cut-Extrude4 (cut, up to next)
    with BuildSketch(Plane.XY.offset(25.675), mode=Mode.PRIVATE) as cut_extrude4_sk2:
        with Locations((14.549999995, -40.065)):
            Circle(SKETCH12_R_2)
    cut_extrude4_tool2 = extrude(cut_extrude4_sk2.sketch, amount=-CUT_EXTRUDE4_REACH, mode=Mode.PRIVATE) & part.part
    # Sketch12 → Cut-Extrude4 (cut, up to next)
    with BuildSketch(Plane.XY.offset(25.675), mode=Mode.PRIVATE) as cut_extrude4_sk3:
        with Locations((35.049999995, -40.065)):
            Circle(SKETCH12_R_2)
    cut_extrude4_tool3 = extrude(cut_extrude4_sk3.sketch, amount=-CUT_EXTRUDE4_REACH, mode=Mode.PRIVATE) & part.part
    # Sketch12 → Cut-Extrude4 (cut, up to next)
    with BuildSketch(Plane.XY.offset(25.675), mode=Mode.PRIVATE) as cut_extrude4_sk4:
        with Locations((35.049999995, -60.765)):
            Circle(SKETCH12_R_3)
    cut_extrude4_tool4 = extrude(cut_extrude4_sk4.sketch, amount=-CUT_EXTRUDE4_REACH, mode=Mode.PRIVATE) & part.part
    # Sketch12 → Cut-Extrude4 (cut, up to next)
    with BuildSketch(Plane.XY.offset(25.675), mode=Mode.PRIVATE) as cut_extrude4_sk5:
        with Locations((14.55, -60.765)):
            Circle(SKETCH12_R_4)
    cut_extrude4_tool5 = extrude(cut_extrude4_sk5.sketch, amount=-CUT_EXTRUDE4_REACH, mode=Mode.PRIVATE) & part.part
    add(cut_extrude4_tool1.solids().sort_by_distance((24.8, -69.065, 25.675))[0], mode=Mode.SUBTRACT)
    add(cut_extrude4_tool2.solids().sort_by_distance((14.55, -40.065, 25.675))[0], mode=Mode.SUBTRACT)
    add(cut_extrude4_tool3.solids().sort_by_distance((35.05, -40.065, 25.675))[0], mode=Mode.SUBTRACT)
    add(cut_extrude4_tool4.solids().sort_by_distance((35.05, -60.765, 25.675))[0], mode=Mode.SUBTRACT)
    add(cut_extrude4_tool5.solids().sort_by_distance((14.55, -60.765, 25.675))[0], mode=Mode.SUBTRACT)

    # Sketch13 → Boss-Extrude7 (add)
    # profile 1 of 2: a face of its own
    with BuildSketch(Plane(origin=(0, 0, 22.5), x_dir=(-1, 0, 0), z_dir=(0, 0, -1))):
        with Locations((-14.693710375, -50.904646349)):
            Rectangle(SKETCH13_W, SKETCH13_H)
        with Locations(Location((-14.55, -60.765, 0), (0, 0, 180))):
            Circle(SKETCH13_R, mode=Mode.SUBTRACT)
        with Locations(Location((-14.549999995, -40.065, 0), (0, 0, 180))):
            Circle(SKETCH13_R_2, mode=Mode.SUBTRACT)
    # profile 2 of 2: a face of its own
    with BuildSketch(Plane(origin=(0, 0, 22.5), x_dir=(-1, 0, 0), z_dir=(0, 0, -1))):
        with Locations((-34.929584807, -50.904646349)):
            Rectangle(SKETCH13_W, SKETCH13_H)
        with Locations(Location((-35.049999995, -40.065, 0), (0, 0, 180))):
            Circle(SKETCH13_R_2, mode=Mode.SUBTRACT)
        with Locations(Location((-35.049999995, -60.765, 0), (0, 0, 180))):
            Circle(SKETCH13_R_3, mode=Mode.SUBTRACT)
    extrude(amount=BOSS_EXTRUDE7_DEPTH)

    # Sketch14 → Boss-Extrude8 (add)
    with BuildSketch(Plane(origin=(0, 0, 22.5), x_dir=(-1, 0, 0), z_dir=(0, 0, -1))):
        with Locations((-24.813415361, -69.97)):
            Rectangle(SKETCH14_W, SKETCH14_H)
        with Locations(Location((-24.8, -69.065, 0), (0, 0, 180))):
            Circle(SKETCH14_R, mode=Mode.SUBTRACT)
    extrude(amount=BOSS_EXTRUDE8_DEPTH)

    # Sketch20 → Boss-Extrude11 (add)
    with BuildSketch(Plane(origin=(0, 0, -25.675), x_dir=(-1, 0, 0), z_dir=(0, 0, -1))):
        with BuildLine():
            Line((-37.3, -69.38), (-37.3, -109.38))
            Line((-37.3, -109.38), (-29.9, -114.0625))
            ThreePointArc((-29.9, -114.0625), (-24.8, -119.1625), (-19.7, -114.0625))
            Line((-19.7, -114.0625), (-12.3, -109.38))
            Line((-12.3, -109.38), (-12.3, -69.38))
            Line((-12.3, -69.38), (-37.3, -69.38))
        make_face()
        with Locations(Location((-24.8, -114.0625, 0), (0, 0, 90))):
            Circle(SKETCH20_R, mode=Mode.SUBTRACT)
    extrude(amount=BOSS_EXTRUDE11_DEPTH)

    # Sketch21 → Boss-Extrude12 (add)
    with BuildSketch(Plane.XY.offset(-25.675).offset(BOSS_EXTRUDE12_START)):
        with Locations((24.8, -114.0625)):
            Circle(SKETCH21_R)
        with Locations((24.8, -114.0625)):
            Circle(SKETCH21_R_2, mode=Mode.SUBTRACT)
    extrude(amount=-BOSS_EXTRUDE12_DEPTH)

    # Chamfer10
    chamfer10_edges = [part.edges().sort_by_distance(p)[0] for p in [
        (24.8, -69.38, -25.675),
    ]]
    chamfer(chamfer10_edges, length=CHAMFER10_SIZE - 0.0001)  # a hair under: the kernel refuses the full size

    # Sketch23 → Cut-Extrude5 (cut, up to next)
    with BuildSketch(Plane.XY.offset(25.675), mode=Mode.PRIVATE) as cut_extrude5_sk1:
        with Locations((7.001302854, -51.165)):
            Circle(SKETCH23_R)
    cut_extrude5_tool1 = extrude(cut_extrude5_sk1.sketch, amount=-CUT_EXTRUDE5_REACH, mode=Mode.PRIVATE) & part.part
    # Sketch23 → Cut-Extrude5 (cut, up to next)
    with BuildSketch(Plane.XY.offset(25.675), mode=Mode.PRIVATE) as cut_extrude5_sk2:
        with Locations((24.799997965, -46.165)):
            Circle(SKETCH23_R)
    cut_extrude5_tool2 = extrude(cut_extrude5_sk2.sketch, amount=-CUT_EXTRUDE5_REACH, mode=Mode.PRIVATE) & part.part
    # Sketch23 → Cut-Extrude5 (cut, up to next)
    with BuildSketch(Plane.XY.offset(25.675), mode=Mode.PRIVATE) as cut_extrude5_sk3:
        with Locations((42.001302854, -51.165)):
            Circle(SKETCH23_R)
    cut_extrude5_tool3 = extrude(cut_extrude5_sk3.sketch, amount=-CUT_EXTRUDE5_REACH, mode=Mode.PRIVATE) & part.part
    add(cut_extrude5_tool1.solids().sort_by_distance((7.001303, -51.165, 25.675))[0], mode=Mode.SUBTRACT)
    add(cut_extrude5_tool2.solids().sort_by_distance((24.799998, -46.165, 25.675))[0], mode=Mode.SUBTRACT)
    add(cut_extrude5_tool3.solids().sort_by_distance((42.001303, -51.165, 25.675))[0], mode=Mode.SUBTRACT)


solid = part.part
